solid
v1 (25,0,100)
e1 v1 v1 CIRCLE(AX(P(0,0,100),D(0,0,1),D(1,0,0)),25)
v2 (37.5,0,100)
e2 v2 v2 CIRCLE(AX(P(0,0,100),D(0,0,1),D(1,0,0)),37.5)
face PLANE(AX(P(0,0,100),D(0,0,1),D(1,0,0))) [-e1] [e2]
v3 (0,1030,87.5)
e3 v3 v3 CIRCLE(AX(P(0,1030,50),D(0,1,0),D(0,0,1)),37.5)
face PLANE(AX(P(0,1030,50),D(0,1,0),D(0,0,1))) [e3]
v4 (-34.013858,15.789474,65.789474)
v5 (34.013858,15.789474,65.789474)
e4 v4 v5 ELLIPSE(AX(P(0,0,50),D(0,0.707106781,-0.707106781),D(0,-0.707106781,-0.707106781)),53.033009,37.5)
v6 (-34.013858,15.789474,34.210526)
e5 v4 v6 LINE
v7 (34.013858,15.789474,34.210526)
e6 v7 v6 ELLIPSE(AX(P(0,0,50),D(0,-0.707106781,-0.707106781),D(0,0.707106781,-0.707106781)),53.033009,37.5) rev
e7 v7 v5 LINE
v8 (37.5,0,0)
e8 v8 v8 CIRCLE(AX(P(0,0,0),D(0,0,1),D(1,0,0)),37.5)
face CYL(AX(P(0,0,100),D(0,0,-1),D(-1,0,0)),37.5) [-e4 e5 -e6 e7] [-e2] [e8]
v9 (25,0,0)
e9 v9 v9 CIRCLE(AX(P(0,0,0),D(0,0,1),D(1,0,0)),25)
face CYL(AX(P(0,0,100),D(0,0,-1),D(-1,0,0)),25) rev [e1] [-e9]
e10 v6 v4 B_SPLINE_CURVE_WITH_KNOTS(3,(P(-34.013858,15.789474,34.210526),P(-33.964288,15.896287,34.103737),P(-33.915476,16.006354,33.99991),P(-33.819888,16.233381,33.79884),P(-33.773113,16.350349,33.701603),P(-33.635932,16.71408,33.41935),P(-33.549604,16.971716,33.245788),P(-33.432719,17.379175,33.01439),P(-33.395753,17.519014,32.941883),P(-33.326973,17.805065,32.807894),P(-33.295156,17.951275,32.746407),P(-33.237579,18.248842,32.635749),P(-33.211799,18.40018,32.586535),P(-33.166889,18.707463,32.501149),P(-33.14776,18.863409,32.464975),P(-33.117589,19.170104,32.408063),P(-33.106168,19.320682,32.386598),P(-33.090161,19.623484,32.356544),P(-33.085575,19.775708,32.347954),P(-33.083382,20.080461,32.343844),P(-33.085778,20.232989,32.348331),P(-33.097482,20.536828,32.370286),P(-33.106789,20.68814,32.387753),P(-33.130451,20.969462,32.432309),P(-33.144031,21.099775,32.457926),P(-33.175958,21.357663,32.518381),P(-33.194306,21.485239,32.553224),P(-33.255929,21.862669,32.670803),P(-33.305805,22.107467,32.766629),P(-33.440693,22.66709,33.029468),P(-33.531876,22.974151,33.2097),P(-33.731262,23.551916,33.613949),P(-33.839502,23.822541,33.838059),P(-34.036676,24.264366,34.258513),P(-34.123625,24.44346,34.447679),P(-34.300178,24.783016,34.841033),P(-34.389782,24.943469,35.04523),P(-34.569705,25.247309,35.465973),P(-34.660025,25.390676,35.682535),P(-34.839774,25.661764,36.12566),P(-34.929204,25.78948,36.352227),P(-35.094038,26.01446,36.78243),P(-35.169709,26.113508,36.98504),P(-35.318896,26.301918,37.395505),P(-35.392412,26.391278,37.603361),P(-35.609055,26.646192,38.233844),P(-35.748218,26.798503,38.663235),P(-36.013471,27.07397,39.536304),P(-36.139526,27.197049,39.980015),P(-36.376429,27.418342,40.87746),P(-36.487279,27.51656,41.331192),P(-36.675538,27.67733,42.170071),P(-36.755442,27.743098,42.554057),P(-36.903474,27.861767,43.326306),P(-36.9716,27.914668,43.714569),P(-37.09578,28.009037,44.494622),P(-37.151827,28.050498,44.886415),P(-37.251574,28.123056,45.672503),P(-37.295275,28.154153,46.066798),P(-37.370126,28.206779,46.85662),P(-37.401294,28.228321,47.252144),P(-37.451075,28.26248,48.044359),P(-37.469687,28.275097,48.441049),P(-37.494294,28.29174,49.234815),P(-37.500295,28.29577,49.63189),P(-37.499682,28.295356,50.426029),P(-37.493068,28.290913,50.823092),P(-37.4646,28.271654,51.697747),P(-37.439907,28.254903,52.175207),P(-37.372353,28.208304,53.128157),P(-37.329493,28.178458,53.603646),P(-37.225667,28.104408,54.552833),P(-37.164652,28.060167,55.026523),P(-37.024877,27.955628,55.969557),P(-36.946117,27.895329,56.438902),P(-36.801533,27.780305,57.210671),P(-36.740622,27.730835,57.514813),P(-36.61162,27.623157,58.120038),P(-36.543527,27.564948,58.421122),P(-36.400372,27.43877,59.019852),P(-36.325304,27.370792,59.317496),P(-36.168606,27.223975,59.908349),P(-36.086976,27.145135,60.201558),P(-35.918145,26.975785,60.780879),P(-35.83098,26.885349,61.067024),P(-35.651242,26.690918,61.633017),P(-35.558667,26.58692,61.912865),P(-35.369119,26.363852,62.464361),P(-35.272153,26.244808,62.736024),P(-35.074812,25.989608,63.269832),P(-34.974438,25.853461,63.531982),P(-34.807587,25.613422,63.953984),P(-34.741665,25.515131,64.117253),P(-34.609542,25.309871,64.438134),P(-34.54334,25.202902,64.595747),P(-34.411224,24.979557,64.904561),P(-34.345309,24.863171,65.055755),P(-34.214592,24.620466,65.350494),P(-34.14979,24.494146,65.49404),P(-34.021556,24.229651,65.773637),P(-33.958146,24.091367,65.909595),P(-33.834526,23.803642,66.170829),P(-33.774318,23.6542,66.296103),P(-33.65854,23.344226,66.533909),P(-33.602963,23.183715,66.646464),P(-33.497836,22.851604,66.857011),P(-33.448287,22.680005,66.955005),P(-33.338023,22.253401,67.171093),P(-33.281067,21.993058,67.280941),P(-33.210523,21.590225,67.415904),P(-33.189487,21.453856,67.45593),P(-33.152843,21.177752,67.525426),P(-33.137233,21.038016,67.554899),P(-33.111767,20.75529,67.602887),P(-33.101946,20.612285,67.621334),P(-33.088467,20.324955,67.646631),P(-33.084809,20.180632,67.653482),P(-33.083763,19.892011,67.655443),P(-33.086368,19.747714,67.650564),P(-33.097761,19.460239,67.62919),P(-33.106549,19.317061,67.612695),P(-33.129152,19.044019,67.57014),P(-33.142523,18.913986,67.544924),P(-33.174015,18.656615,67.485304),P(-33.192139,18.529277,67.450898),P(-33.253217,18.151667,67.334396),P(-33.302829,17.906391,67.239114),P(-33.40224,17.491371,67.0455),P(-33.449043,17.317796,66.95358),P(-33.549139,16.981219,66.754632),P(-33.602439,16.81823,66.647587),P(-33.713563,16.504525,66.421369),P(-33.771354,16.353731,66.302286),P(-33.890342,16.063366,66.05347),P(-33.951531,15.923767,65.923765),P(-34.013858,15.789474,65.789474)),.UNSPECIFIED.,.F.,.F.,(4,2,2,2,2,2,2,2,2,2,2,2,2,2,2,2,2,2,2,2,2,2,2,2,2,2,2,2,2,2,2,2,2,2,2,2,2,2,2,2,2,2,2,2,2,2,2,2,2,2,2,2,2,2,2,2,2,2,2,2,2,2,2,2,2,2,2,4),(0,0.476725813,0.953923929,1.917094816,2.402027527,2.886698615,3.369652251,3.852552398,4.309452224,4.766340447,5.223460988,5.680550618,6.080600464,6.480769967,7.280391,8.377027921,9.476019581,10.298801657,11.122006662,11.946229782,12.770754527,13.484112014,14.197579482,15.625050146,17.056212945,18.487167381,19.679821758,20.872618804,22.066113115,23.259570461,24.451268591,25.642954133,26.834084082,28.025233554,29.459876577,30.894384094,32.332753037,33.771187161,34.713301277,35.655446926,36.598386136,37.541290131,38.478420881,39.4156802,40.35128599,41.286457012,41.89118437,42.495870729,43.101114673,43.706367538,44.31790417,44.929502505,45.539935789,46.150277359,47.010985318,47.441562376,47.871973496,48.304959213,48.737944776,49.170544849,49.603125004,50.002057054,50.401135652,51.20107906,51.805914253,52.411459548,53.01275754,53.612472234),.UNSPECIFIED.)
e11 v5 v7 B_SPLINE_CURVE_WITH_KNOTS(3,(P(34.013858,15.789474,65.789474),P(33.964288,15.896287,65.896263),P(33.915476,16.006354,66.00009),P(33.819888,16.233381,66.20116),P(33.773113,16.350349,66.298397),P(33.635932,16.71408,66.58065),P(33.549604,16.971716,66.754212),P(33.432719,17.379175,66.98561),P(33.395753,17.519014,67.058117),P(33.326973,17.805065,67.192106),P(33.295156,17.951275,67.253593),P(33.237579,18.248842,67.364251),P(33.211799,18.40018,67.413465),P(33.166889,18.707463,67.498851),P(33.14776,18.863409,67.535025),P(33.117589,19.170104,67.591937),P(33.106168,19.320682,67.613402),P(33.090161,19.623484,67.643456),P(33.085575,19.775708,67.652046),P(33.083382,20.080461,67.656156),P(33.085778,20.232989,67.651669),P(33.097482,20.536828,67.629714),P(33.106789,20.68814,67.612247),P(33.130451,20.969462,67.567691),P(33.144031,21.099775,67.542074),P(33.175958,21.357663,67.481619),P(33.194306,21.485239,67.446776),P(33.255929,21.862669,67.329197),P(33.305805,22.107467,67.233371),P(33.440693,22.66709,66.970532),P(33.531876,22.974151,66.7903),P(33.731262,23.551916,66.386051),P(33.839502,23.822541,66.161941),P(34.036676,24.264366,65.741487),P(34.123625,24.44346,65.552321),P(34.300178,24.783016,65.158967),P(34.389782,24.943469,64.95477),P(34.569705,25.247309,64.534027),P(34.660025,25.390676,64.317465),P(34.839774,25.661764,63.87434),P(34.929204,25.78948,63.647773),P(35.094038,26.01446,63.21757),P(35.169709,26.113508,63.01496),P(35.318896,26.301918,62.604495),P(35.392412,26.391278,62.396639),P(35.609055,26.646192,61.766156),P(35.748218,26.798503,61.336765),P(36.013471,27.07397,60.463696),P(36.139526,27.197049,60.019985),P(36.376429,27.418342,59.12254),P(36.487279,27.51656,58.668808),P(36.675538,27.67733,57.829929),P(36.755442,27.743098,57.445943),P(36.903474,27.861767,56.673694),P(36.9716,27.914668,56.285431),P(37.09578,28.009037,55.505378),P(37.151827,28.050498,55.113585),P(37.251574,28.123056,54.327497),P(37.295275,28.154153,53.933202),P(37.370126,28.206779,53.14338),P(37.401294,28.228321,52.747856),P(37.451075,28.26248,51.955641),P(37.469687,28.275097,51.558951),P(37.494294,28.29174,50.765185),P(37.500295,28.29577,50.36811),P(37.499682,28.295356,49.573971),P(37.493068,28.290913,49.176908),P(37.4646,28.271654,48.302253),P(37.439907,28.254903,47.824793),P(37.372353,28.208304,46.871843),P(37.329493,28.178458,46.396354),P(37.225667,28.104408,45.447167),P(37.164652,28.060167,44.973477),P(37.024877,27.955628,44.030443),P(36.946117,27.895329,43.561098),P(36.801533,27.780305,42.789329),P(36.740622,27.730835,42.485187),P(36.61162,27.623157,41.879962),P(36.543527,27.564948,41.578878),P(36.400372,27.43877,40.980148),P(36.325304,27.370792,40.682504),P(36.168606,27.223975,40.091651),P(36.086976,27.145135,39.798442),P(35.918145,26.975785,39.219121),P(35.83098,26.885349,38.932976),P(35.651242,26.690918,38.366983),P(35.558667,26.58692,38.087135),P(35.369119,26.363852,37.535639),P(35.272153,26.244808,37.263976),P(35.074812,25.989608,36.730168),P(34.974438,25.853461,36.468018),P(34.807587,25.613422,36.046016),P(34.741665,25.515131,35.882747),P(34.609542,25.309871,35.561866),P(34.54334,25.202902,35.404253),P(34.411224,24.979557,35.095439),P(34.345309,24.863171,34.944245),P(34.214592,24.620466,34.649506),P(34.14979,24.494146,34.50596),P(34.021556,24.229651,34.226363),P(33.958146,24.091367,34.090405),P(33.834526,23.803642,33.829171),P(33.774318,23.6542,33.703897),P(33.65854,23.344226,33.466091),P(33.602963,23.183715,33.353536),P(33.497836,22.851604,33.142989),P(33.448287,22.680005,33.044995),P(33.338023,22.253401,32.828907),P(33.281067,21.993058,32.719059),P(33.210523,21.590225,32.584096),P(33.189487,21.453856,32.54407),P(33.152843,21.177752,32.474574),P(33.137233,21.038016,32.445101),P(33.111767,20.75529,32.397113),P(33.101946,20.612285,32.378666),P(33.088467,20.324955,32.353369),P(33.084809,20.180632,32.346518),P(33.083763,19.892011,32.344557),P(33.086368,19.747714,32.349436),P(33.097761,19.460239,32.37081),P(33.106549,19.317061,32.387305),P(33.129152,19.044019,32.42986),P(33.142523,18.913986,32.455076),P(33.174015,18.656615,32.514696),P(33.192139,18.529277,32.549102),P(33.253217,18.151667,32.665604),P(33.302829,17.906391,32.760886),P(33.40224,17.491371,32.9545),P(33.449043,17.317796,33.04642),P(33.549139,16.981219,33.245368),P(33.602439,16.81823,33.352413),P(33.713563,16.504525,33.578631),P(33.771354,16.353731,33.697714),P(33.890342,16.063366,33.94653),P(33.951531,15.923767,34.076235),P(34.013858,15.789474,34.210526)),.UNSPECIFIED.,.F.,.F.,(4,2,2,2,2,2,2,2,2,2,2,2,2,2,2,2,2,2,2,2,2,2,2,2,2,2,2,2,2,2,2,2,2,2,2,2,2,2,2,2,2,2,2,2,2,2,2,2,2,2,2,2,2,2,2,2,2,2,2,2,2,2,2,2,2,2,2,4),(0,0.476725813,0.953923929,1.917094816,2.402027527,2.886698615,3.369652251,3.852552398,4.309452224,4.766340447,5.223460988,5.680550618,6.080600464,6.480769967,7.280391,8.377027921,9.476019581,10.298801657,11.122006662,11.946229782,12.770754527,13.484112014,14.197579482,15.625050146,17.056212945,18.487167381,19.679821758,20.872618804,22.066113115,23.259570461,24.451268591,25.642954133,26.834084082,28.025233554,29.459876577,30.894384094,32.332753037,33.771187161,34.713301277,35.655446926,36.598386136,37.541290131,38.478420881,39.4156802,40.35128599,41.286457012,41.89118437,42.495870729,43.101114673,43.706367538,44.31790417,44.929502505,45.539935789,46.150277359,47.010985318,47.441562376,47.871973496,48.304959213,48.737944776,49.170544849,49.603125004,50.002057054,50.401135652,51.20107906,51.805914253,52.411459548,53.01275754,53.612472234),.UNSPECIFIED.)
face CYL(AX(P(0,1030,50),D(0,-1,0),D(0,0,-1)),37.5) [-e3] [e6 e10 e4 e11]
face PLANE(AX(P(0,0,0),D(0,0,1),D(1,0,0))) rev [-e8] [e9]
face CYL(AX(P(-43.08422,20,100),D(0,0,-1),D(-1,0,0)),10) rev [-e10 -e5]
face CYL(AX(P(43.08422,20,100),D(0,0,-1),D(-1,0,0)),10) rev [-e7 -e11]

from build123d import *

# Parameters (mm, degrees)
SKETCH1_R           = 37.5
SKETCH1_R_2         = 25
BOSS_EXTRUDE1_DEPTH = 100
BOSS_EXTRUDE2_START = 30
SKETCH2_R           = 37.5
BOSS_EXTRUDE2_DEPTH = 1000
FILLET1_R           = 10


with BuildPart() as part:
    # Sketch1 → Boss-Extrude1 (new body)
    with BuildSketch(Plane.XY):
        Circle(SKETCH1_R)
        Circle(SKETCH1_R_2, mode=Mode.SUBTRACT)
    extrude(amount=BOSS_EXTRUDE1_DEPTH)

    # Sketch2 → Boss-Extrude2 (add)
    with BuildSketch(Plane(origin=(0, 0, 0), x_dir=(1, 0, 0), z_dir=(0, 1, 0)).offset(BOSS_EXTRUDE2_START)):
        with Locations(Location((0, -50, 0), (0, 0, 53.130102354))):
            Circle(SKETCH2_R)
    extrude(amount=BOSS_EXTRUDE2_DEPTH)

    # Fillet1
    # the kernel refuses this fillet: 10 mm, written as the material it adds along each edge
    with BuildSketch(Plane(origin=(22.5, 30, 131.460549623), x_dir=(0.6295317231300945, -0.7769747805256321, 0), z_dir=(0, 0, -1))) as fillet1_piece_1_section:
        with BuildLine():
            CenterArc((20.728167196, -9.698102468), FILLET1_R, 104.114519992, 114.90106237)
            Line((12.958419391, -15.993419699), (0, 0))
            ThreePointArc((0, 0), (9.144779645, -1.132115744), (18.289559291, 0))
        make_face()
    fillet1_piece_1 = extrude(amount=162.921099245, mode=Mode.PRIVATE)
    fillet1_piece_1 = fillet1_piece_1 & Plane(origin=(0, 26.517376083, 50), x_dir=(0.6000000000021779, 0, -0.7999999999983666), z_dir=(0, -1, 0)) * Cylinder(37.5, 400, mode=Mode.PRIVATE)
    add(fillet1_piece_1)
    with BuildSketch(Plane(origin=(-22.5, 30, 131.460549623), x_dir=(-0.6295317231300945, -0.7769747805256321, 0), z_dir=(0, 0, -1))) as fillet1_piece_2_section:
        with BuildLine():
            CenterArc((20.728167196, 9.698102468), FILLET1_R, 140.984417638, 114.90106237)
            Line((12.958419391, 15.993419699), (0, 0))
            ThreePointArc((0, 0), (9.144779645, 1.132115744), (18.289559291, 0))
        make_face()
    fillet1_piece_2 = extrude(amount=162.921099245, mode=Mode.PRIVATE)
    fillet1_piece_2 = fillet1_piece_2 & Plane(origin=(0, 26.517339573, 50), x_dir=(0.6000000000021779, 0, -0.7999999999983666), z_dir=(0, -1, 0)) * Cylinder(37.5, 400, mode=Mode.PRIVATE)
    add(fillet1_piece_2)


solid = part.part
